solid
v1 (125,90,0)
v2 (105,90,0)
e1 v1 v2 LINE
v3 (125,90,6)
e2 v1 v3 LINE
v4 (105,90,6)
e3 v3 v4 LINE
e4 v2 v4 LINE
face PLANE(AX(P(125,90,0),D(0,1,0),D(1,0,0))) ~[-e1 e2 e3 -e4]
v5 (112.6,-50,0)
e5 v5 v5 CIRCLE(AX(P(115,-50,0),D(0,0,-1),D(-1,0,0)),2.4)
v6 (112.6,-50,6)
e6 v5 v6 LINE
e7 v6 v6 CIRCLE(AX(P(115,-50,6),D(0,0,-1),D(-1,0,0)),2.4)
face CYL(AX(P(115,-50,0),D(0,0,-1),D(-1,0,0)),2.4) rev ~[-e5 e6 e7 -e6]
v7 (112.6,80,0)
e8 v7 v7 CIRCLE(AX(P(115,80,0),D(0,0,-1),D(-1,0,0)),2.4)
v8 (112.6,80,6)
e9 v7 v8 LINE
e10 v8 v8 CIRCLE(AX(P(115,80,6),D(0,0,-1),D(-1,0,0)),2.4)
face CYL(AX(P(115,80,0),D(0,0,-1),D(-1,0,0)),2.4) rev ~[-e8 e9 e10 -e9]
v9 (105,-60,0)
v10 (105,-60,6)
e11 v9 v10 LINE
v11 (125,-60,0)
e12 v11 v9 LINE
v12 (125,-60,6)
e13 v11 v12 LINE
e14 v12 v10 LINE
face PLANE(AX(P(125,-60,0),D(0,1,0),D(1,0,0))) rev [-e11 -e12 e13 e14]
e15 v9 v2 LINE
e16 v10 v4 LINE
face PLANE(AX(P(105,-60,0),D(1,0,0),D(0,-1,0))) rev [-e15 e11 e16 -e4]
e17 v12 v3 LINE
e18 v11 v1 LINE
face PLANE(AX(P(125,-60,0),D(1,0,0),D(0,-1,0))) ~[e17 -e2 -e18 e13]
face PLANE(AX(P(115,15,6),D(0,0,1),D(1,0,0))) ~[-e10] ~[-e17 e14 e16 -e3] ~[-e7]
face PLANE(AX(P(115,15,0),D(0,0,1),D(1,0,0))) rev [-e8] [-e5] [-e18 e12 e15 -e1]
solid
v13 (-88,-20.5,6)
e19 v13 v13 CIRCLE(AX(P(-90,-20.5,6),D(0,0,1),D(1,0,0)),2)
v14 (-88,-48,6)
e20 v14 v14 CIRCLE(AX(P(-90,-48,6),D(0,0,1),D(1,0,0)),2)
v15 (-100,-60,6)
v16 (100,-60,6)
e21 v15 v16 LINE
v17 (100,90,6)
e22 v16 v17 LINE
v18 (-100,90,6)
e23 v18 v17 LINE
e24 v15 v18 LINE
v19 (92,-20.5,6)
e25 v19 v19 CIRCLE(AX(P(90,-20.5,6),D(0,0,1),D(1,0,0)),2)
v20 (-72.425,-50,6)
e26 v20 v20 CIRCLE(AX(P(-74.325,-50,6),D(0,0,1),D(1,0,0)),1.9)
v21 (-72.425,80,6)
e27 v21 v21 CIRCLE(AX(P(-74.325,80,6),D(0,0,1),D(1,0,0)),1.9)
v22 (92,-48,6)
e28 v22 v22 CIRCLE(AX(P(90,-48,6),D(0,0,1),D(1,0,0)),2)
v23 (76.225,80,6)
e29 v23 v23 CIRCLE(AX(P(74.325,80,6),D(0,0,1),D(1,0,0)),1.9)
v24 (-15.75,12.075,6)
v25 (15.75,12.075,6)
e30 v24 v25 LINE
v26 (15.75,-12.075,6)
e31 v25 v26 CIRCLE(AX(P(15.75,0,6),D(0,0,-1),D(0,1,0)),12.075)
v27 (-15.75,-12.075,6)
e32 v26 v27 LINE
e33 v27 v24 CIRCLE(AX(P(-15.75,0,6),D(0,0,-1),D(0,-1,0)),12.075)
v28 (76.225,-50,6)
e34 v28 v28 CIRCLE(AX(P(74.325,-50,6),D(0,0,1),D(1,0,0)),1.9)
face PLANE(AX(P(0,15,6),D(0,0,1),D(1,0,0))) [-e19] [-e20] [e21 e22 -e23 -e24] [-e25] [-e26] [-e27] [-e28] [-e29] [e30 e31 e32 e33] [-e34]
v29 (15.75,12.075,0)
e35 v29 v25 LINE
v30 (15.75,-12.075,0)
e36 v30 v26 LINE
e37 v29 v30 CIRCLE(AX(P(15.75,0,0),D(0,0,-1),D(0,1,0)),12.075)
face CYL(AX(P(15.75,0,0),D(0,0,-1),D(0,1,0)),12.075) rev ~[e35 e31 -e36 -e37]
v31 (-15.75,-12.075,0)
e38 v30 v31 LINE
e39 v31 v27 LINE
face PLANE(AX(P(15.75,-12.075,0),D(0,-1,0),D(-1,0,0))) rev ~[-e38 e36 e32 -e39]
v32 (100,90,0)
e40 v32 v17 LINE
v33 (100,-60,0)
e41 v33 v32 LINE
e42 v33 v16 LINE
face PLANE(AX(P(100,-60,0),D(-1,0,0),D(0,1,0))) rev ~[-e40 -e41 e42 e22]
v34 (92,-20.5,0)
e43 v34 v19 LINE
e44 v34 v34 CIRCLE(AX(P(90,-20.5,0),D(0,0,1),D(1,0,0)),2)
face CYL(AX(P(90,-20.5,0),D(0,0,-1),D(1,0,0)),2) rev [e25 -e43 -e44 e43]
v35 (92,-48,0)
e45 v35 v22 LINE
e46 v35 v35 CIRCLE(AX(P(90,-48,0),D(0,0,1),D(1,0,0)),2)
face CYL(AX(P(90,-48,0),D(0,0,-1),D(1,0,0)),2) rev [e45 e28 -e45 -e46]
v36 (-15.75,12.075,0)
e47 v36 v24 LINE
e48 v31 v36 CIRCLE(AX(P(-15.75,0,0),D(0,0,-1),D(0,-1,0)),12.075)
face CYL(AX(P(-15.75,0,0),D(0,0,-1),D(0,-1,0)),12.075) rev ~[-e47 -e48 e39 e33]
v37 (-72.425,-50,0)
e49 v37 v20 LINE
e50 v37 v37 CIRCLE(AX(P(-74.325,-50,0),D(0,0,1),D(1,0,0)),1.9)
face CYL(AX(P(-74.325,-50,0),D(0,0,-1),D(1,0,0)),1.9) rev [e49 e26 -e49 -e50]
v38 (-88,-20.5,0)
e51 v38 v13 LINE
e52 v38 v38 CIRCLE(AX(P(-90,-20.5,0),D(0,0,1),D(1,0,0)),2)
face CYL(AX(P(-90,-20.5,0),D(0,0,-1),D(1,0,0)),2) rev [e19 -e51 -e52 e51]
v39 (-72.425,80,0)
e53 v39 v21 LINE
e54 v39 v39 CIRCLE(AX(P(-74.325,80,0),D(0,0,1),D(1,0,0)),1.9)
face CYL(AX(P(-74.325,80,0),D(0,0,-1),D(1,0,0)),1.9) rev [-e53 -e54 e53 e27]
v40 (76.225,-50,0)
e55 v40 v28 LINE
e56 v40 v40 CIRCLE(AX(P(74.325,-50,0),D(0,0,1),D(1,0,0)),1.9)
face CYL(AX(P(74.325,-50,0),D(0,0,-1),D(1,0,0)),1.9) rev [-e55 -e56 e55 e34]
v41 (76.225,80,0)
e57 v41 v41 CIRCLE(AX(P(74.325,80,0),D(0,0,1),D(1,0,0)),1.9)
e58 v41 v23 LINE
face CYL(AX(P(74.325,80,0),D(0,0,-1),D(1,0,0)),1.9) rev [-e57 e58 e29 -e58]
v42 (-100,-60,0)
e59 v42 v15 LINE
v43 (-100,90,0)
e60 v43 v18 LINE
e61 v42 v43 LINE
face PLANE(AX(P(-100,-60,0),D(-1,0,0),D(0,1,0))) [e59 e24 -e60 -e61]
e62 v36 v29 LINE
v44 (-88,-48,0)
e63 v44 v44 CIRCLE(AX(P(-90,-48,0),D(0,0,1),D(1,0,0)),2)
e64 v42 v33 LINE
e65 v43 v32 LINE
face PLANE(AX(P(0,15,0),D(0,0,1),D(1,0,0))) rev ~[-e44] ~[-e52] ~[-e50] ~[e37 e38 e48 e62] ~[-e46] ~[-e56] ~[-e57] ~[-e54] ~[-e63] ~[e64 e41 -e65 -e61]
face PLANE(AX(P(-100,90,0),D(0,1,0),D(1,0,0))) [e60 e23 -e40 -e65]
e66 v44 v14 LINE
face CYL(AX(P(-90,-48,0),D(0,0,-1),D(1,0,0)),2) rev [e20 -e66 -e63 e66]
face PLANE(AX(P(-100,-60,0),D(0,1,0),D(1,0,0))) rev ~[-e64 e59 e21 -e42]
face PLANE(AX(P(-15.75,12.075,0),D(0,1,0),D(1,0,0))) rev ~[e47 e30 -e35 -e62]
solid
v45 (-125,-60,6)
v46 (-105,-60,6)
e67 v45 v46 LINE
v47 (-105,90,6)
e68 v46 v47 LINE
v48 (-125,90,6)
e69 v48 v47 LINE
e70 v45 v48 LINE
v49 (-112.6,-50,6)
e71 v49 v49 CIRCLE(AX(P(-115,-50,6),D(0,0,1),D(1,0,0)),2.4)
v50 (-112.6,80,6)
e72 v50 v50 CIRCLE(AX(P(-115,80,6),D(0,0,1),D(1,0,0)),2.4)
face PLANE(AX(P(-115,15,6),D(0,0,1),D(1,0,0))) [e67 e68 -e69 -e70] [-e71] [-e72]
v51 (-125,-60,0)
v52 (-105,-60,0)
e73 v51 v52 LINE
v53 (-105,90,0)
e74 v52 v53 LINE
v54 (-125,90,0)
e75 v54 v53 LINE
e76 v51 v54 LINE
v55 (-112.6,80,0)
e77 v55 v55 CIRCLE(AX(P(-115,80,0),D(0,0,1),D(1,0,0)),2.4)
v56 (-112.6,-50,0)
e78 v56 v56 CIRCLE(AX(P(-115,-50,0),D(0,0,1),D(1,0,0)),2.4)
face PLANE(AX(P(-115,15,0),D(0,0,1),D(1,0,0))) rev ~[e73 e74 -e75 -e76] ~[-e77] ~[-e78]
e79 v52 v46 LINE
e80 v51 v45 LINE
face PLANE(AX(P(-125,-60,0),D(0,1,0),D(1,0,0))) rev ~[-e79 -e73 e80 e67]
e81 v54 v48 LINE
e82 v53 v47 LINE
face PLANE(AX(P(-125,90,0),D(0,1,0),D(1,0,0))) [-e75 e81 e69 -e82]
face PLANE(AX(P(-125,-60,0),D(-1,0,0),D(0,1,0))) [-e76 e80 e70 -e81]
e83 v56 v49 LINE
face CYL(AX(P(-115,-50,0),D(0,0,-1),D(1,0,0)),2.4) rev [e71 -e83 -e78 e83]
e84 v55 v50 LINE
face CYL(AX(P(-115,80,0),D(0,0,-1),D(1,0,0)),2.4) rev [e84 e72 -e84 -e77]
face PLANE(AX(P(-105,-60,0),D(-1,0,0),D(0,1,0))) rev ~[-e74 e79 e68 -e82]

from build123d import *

# Parameters (mm, degrees)
F4_W     = 20
F4_H     = 150
F4_R     = 2.4
F5_DEPTH = 6
F3_W     = 200
F3_H     = 150
F3_R     = 2
F3_R_2   = 1.9


# Not quite as in the source:
# - a pattern or mirror of a feature is missing from the dataset's text; its kind, count and spacing are read off the source's solid
# - a feature names something its author has since deleted; it is built from what else it names


with BuildPart() as f5:
    # F4 (on Top) → F5 (new body)
    with BuildSketch(Plane.XY):
        with Locations((-115, 15)):
            Rectangle(F4_W, F4_H)
        with Locations((-115, -50)):
            Circle(F4_R, mode=Mode.SUBTRACT)
        with Locations((-115, 80)):
            Circle(F4_R, mode=Mode.SUBTRACT)
    extrude(amount=F5_DEPTH)


with BuildPart() as f5b:
    # F3 (on Top) → F5, piece 2 (new body)
    with BuildSketch(Plane.XY):
        with Locations((0, 15)):
            Rectangle(F3_W, F3_H)
        with Locations((-90, -48)):
            Circle(F3_R, mode=Mode.SUBTRACT)
        with Locations((-74.325, -50)):
            Circle(F3_R_2, mode=Mode.SUBTRACT)
        with Locations((-90, -20.5)):
            Circle(F3_R, mode=Mode.SUBTRACT)
        with Locations((74.325, -50)):
            Circle(F3_R_2, mode=Mode.SUBTRACT)
        with Locations((90, -48)):
            Circle(F3_R, mode=Mode.SUBTRACT)
        with BuildLine():
            ThreePointArc((-15.75, -12.075), (-27.825, 0), (-15.75, 12.075))
            Line((-15.75, 12.075), (15.75, 12.075))
            ThreePointArc((15.75, 12.075), (27.825, 0), (15.75, -12.075))
            Line((15.75, -12.075), (-15.75, -12.075))
        make_face(mode=Mode.SUBTRACT)
        with Locations((90, -20.5)):
            Circle(F3_R, mode=Mode.SUBTRACT)
        with Locations((-74.325, 80)):
            Circle(F3_R_2, mode=Mode.SUBTRACT)
        with Locations((74.325, 80)):
            Circle(F3_R_2, mode=Mode.SUBTRACT)
    extrude(amount=F5_DEPTH)


with BuildPart() as f5_copies_1:
    # F5_copies: instance of F5
    add(f5.part.mirror(Plane(origin=(0, 0, 0), x_dir=(0, 0, 1), z_dir=(1, 0, 0))))


solid = Compound([f5.part, f5b.part, f5_copies_1.part])
